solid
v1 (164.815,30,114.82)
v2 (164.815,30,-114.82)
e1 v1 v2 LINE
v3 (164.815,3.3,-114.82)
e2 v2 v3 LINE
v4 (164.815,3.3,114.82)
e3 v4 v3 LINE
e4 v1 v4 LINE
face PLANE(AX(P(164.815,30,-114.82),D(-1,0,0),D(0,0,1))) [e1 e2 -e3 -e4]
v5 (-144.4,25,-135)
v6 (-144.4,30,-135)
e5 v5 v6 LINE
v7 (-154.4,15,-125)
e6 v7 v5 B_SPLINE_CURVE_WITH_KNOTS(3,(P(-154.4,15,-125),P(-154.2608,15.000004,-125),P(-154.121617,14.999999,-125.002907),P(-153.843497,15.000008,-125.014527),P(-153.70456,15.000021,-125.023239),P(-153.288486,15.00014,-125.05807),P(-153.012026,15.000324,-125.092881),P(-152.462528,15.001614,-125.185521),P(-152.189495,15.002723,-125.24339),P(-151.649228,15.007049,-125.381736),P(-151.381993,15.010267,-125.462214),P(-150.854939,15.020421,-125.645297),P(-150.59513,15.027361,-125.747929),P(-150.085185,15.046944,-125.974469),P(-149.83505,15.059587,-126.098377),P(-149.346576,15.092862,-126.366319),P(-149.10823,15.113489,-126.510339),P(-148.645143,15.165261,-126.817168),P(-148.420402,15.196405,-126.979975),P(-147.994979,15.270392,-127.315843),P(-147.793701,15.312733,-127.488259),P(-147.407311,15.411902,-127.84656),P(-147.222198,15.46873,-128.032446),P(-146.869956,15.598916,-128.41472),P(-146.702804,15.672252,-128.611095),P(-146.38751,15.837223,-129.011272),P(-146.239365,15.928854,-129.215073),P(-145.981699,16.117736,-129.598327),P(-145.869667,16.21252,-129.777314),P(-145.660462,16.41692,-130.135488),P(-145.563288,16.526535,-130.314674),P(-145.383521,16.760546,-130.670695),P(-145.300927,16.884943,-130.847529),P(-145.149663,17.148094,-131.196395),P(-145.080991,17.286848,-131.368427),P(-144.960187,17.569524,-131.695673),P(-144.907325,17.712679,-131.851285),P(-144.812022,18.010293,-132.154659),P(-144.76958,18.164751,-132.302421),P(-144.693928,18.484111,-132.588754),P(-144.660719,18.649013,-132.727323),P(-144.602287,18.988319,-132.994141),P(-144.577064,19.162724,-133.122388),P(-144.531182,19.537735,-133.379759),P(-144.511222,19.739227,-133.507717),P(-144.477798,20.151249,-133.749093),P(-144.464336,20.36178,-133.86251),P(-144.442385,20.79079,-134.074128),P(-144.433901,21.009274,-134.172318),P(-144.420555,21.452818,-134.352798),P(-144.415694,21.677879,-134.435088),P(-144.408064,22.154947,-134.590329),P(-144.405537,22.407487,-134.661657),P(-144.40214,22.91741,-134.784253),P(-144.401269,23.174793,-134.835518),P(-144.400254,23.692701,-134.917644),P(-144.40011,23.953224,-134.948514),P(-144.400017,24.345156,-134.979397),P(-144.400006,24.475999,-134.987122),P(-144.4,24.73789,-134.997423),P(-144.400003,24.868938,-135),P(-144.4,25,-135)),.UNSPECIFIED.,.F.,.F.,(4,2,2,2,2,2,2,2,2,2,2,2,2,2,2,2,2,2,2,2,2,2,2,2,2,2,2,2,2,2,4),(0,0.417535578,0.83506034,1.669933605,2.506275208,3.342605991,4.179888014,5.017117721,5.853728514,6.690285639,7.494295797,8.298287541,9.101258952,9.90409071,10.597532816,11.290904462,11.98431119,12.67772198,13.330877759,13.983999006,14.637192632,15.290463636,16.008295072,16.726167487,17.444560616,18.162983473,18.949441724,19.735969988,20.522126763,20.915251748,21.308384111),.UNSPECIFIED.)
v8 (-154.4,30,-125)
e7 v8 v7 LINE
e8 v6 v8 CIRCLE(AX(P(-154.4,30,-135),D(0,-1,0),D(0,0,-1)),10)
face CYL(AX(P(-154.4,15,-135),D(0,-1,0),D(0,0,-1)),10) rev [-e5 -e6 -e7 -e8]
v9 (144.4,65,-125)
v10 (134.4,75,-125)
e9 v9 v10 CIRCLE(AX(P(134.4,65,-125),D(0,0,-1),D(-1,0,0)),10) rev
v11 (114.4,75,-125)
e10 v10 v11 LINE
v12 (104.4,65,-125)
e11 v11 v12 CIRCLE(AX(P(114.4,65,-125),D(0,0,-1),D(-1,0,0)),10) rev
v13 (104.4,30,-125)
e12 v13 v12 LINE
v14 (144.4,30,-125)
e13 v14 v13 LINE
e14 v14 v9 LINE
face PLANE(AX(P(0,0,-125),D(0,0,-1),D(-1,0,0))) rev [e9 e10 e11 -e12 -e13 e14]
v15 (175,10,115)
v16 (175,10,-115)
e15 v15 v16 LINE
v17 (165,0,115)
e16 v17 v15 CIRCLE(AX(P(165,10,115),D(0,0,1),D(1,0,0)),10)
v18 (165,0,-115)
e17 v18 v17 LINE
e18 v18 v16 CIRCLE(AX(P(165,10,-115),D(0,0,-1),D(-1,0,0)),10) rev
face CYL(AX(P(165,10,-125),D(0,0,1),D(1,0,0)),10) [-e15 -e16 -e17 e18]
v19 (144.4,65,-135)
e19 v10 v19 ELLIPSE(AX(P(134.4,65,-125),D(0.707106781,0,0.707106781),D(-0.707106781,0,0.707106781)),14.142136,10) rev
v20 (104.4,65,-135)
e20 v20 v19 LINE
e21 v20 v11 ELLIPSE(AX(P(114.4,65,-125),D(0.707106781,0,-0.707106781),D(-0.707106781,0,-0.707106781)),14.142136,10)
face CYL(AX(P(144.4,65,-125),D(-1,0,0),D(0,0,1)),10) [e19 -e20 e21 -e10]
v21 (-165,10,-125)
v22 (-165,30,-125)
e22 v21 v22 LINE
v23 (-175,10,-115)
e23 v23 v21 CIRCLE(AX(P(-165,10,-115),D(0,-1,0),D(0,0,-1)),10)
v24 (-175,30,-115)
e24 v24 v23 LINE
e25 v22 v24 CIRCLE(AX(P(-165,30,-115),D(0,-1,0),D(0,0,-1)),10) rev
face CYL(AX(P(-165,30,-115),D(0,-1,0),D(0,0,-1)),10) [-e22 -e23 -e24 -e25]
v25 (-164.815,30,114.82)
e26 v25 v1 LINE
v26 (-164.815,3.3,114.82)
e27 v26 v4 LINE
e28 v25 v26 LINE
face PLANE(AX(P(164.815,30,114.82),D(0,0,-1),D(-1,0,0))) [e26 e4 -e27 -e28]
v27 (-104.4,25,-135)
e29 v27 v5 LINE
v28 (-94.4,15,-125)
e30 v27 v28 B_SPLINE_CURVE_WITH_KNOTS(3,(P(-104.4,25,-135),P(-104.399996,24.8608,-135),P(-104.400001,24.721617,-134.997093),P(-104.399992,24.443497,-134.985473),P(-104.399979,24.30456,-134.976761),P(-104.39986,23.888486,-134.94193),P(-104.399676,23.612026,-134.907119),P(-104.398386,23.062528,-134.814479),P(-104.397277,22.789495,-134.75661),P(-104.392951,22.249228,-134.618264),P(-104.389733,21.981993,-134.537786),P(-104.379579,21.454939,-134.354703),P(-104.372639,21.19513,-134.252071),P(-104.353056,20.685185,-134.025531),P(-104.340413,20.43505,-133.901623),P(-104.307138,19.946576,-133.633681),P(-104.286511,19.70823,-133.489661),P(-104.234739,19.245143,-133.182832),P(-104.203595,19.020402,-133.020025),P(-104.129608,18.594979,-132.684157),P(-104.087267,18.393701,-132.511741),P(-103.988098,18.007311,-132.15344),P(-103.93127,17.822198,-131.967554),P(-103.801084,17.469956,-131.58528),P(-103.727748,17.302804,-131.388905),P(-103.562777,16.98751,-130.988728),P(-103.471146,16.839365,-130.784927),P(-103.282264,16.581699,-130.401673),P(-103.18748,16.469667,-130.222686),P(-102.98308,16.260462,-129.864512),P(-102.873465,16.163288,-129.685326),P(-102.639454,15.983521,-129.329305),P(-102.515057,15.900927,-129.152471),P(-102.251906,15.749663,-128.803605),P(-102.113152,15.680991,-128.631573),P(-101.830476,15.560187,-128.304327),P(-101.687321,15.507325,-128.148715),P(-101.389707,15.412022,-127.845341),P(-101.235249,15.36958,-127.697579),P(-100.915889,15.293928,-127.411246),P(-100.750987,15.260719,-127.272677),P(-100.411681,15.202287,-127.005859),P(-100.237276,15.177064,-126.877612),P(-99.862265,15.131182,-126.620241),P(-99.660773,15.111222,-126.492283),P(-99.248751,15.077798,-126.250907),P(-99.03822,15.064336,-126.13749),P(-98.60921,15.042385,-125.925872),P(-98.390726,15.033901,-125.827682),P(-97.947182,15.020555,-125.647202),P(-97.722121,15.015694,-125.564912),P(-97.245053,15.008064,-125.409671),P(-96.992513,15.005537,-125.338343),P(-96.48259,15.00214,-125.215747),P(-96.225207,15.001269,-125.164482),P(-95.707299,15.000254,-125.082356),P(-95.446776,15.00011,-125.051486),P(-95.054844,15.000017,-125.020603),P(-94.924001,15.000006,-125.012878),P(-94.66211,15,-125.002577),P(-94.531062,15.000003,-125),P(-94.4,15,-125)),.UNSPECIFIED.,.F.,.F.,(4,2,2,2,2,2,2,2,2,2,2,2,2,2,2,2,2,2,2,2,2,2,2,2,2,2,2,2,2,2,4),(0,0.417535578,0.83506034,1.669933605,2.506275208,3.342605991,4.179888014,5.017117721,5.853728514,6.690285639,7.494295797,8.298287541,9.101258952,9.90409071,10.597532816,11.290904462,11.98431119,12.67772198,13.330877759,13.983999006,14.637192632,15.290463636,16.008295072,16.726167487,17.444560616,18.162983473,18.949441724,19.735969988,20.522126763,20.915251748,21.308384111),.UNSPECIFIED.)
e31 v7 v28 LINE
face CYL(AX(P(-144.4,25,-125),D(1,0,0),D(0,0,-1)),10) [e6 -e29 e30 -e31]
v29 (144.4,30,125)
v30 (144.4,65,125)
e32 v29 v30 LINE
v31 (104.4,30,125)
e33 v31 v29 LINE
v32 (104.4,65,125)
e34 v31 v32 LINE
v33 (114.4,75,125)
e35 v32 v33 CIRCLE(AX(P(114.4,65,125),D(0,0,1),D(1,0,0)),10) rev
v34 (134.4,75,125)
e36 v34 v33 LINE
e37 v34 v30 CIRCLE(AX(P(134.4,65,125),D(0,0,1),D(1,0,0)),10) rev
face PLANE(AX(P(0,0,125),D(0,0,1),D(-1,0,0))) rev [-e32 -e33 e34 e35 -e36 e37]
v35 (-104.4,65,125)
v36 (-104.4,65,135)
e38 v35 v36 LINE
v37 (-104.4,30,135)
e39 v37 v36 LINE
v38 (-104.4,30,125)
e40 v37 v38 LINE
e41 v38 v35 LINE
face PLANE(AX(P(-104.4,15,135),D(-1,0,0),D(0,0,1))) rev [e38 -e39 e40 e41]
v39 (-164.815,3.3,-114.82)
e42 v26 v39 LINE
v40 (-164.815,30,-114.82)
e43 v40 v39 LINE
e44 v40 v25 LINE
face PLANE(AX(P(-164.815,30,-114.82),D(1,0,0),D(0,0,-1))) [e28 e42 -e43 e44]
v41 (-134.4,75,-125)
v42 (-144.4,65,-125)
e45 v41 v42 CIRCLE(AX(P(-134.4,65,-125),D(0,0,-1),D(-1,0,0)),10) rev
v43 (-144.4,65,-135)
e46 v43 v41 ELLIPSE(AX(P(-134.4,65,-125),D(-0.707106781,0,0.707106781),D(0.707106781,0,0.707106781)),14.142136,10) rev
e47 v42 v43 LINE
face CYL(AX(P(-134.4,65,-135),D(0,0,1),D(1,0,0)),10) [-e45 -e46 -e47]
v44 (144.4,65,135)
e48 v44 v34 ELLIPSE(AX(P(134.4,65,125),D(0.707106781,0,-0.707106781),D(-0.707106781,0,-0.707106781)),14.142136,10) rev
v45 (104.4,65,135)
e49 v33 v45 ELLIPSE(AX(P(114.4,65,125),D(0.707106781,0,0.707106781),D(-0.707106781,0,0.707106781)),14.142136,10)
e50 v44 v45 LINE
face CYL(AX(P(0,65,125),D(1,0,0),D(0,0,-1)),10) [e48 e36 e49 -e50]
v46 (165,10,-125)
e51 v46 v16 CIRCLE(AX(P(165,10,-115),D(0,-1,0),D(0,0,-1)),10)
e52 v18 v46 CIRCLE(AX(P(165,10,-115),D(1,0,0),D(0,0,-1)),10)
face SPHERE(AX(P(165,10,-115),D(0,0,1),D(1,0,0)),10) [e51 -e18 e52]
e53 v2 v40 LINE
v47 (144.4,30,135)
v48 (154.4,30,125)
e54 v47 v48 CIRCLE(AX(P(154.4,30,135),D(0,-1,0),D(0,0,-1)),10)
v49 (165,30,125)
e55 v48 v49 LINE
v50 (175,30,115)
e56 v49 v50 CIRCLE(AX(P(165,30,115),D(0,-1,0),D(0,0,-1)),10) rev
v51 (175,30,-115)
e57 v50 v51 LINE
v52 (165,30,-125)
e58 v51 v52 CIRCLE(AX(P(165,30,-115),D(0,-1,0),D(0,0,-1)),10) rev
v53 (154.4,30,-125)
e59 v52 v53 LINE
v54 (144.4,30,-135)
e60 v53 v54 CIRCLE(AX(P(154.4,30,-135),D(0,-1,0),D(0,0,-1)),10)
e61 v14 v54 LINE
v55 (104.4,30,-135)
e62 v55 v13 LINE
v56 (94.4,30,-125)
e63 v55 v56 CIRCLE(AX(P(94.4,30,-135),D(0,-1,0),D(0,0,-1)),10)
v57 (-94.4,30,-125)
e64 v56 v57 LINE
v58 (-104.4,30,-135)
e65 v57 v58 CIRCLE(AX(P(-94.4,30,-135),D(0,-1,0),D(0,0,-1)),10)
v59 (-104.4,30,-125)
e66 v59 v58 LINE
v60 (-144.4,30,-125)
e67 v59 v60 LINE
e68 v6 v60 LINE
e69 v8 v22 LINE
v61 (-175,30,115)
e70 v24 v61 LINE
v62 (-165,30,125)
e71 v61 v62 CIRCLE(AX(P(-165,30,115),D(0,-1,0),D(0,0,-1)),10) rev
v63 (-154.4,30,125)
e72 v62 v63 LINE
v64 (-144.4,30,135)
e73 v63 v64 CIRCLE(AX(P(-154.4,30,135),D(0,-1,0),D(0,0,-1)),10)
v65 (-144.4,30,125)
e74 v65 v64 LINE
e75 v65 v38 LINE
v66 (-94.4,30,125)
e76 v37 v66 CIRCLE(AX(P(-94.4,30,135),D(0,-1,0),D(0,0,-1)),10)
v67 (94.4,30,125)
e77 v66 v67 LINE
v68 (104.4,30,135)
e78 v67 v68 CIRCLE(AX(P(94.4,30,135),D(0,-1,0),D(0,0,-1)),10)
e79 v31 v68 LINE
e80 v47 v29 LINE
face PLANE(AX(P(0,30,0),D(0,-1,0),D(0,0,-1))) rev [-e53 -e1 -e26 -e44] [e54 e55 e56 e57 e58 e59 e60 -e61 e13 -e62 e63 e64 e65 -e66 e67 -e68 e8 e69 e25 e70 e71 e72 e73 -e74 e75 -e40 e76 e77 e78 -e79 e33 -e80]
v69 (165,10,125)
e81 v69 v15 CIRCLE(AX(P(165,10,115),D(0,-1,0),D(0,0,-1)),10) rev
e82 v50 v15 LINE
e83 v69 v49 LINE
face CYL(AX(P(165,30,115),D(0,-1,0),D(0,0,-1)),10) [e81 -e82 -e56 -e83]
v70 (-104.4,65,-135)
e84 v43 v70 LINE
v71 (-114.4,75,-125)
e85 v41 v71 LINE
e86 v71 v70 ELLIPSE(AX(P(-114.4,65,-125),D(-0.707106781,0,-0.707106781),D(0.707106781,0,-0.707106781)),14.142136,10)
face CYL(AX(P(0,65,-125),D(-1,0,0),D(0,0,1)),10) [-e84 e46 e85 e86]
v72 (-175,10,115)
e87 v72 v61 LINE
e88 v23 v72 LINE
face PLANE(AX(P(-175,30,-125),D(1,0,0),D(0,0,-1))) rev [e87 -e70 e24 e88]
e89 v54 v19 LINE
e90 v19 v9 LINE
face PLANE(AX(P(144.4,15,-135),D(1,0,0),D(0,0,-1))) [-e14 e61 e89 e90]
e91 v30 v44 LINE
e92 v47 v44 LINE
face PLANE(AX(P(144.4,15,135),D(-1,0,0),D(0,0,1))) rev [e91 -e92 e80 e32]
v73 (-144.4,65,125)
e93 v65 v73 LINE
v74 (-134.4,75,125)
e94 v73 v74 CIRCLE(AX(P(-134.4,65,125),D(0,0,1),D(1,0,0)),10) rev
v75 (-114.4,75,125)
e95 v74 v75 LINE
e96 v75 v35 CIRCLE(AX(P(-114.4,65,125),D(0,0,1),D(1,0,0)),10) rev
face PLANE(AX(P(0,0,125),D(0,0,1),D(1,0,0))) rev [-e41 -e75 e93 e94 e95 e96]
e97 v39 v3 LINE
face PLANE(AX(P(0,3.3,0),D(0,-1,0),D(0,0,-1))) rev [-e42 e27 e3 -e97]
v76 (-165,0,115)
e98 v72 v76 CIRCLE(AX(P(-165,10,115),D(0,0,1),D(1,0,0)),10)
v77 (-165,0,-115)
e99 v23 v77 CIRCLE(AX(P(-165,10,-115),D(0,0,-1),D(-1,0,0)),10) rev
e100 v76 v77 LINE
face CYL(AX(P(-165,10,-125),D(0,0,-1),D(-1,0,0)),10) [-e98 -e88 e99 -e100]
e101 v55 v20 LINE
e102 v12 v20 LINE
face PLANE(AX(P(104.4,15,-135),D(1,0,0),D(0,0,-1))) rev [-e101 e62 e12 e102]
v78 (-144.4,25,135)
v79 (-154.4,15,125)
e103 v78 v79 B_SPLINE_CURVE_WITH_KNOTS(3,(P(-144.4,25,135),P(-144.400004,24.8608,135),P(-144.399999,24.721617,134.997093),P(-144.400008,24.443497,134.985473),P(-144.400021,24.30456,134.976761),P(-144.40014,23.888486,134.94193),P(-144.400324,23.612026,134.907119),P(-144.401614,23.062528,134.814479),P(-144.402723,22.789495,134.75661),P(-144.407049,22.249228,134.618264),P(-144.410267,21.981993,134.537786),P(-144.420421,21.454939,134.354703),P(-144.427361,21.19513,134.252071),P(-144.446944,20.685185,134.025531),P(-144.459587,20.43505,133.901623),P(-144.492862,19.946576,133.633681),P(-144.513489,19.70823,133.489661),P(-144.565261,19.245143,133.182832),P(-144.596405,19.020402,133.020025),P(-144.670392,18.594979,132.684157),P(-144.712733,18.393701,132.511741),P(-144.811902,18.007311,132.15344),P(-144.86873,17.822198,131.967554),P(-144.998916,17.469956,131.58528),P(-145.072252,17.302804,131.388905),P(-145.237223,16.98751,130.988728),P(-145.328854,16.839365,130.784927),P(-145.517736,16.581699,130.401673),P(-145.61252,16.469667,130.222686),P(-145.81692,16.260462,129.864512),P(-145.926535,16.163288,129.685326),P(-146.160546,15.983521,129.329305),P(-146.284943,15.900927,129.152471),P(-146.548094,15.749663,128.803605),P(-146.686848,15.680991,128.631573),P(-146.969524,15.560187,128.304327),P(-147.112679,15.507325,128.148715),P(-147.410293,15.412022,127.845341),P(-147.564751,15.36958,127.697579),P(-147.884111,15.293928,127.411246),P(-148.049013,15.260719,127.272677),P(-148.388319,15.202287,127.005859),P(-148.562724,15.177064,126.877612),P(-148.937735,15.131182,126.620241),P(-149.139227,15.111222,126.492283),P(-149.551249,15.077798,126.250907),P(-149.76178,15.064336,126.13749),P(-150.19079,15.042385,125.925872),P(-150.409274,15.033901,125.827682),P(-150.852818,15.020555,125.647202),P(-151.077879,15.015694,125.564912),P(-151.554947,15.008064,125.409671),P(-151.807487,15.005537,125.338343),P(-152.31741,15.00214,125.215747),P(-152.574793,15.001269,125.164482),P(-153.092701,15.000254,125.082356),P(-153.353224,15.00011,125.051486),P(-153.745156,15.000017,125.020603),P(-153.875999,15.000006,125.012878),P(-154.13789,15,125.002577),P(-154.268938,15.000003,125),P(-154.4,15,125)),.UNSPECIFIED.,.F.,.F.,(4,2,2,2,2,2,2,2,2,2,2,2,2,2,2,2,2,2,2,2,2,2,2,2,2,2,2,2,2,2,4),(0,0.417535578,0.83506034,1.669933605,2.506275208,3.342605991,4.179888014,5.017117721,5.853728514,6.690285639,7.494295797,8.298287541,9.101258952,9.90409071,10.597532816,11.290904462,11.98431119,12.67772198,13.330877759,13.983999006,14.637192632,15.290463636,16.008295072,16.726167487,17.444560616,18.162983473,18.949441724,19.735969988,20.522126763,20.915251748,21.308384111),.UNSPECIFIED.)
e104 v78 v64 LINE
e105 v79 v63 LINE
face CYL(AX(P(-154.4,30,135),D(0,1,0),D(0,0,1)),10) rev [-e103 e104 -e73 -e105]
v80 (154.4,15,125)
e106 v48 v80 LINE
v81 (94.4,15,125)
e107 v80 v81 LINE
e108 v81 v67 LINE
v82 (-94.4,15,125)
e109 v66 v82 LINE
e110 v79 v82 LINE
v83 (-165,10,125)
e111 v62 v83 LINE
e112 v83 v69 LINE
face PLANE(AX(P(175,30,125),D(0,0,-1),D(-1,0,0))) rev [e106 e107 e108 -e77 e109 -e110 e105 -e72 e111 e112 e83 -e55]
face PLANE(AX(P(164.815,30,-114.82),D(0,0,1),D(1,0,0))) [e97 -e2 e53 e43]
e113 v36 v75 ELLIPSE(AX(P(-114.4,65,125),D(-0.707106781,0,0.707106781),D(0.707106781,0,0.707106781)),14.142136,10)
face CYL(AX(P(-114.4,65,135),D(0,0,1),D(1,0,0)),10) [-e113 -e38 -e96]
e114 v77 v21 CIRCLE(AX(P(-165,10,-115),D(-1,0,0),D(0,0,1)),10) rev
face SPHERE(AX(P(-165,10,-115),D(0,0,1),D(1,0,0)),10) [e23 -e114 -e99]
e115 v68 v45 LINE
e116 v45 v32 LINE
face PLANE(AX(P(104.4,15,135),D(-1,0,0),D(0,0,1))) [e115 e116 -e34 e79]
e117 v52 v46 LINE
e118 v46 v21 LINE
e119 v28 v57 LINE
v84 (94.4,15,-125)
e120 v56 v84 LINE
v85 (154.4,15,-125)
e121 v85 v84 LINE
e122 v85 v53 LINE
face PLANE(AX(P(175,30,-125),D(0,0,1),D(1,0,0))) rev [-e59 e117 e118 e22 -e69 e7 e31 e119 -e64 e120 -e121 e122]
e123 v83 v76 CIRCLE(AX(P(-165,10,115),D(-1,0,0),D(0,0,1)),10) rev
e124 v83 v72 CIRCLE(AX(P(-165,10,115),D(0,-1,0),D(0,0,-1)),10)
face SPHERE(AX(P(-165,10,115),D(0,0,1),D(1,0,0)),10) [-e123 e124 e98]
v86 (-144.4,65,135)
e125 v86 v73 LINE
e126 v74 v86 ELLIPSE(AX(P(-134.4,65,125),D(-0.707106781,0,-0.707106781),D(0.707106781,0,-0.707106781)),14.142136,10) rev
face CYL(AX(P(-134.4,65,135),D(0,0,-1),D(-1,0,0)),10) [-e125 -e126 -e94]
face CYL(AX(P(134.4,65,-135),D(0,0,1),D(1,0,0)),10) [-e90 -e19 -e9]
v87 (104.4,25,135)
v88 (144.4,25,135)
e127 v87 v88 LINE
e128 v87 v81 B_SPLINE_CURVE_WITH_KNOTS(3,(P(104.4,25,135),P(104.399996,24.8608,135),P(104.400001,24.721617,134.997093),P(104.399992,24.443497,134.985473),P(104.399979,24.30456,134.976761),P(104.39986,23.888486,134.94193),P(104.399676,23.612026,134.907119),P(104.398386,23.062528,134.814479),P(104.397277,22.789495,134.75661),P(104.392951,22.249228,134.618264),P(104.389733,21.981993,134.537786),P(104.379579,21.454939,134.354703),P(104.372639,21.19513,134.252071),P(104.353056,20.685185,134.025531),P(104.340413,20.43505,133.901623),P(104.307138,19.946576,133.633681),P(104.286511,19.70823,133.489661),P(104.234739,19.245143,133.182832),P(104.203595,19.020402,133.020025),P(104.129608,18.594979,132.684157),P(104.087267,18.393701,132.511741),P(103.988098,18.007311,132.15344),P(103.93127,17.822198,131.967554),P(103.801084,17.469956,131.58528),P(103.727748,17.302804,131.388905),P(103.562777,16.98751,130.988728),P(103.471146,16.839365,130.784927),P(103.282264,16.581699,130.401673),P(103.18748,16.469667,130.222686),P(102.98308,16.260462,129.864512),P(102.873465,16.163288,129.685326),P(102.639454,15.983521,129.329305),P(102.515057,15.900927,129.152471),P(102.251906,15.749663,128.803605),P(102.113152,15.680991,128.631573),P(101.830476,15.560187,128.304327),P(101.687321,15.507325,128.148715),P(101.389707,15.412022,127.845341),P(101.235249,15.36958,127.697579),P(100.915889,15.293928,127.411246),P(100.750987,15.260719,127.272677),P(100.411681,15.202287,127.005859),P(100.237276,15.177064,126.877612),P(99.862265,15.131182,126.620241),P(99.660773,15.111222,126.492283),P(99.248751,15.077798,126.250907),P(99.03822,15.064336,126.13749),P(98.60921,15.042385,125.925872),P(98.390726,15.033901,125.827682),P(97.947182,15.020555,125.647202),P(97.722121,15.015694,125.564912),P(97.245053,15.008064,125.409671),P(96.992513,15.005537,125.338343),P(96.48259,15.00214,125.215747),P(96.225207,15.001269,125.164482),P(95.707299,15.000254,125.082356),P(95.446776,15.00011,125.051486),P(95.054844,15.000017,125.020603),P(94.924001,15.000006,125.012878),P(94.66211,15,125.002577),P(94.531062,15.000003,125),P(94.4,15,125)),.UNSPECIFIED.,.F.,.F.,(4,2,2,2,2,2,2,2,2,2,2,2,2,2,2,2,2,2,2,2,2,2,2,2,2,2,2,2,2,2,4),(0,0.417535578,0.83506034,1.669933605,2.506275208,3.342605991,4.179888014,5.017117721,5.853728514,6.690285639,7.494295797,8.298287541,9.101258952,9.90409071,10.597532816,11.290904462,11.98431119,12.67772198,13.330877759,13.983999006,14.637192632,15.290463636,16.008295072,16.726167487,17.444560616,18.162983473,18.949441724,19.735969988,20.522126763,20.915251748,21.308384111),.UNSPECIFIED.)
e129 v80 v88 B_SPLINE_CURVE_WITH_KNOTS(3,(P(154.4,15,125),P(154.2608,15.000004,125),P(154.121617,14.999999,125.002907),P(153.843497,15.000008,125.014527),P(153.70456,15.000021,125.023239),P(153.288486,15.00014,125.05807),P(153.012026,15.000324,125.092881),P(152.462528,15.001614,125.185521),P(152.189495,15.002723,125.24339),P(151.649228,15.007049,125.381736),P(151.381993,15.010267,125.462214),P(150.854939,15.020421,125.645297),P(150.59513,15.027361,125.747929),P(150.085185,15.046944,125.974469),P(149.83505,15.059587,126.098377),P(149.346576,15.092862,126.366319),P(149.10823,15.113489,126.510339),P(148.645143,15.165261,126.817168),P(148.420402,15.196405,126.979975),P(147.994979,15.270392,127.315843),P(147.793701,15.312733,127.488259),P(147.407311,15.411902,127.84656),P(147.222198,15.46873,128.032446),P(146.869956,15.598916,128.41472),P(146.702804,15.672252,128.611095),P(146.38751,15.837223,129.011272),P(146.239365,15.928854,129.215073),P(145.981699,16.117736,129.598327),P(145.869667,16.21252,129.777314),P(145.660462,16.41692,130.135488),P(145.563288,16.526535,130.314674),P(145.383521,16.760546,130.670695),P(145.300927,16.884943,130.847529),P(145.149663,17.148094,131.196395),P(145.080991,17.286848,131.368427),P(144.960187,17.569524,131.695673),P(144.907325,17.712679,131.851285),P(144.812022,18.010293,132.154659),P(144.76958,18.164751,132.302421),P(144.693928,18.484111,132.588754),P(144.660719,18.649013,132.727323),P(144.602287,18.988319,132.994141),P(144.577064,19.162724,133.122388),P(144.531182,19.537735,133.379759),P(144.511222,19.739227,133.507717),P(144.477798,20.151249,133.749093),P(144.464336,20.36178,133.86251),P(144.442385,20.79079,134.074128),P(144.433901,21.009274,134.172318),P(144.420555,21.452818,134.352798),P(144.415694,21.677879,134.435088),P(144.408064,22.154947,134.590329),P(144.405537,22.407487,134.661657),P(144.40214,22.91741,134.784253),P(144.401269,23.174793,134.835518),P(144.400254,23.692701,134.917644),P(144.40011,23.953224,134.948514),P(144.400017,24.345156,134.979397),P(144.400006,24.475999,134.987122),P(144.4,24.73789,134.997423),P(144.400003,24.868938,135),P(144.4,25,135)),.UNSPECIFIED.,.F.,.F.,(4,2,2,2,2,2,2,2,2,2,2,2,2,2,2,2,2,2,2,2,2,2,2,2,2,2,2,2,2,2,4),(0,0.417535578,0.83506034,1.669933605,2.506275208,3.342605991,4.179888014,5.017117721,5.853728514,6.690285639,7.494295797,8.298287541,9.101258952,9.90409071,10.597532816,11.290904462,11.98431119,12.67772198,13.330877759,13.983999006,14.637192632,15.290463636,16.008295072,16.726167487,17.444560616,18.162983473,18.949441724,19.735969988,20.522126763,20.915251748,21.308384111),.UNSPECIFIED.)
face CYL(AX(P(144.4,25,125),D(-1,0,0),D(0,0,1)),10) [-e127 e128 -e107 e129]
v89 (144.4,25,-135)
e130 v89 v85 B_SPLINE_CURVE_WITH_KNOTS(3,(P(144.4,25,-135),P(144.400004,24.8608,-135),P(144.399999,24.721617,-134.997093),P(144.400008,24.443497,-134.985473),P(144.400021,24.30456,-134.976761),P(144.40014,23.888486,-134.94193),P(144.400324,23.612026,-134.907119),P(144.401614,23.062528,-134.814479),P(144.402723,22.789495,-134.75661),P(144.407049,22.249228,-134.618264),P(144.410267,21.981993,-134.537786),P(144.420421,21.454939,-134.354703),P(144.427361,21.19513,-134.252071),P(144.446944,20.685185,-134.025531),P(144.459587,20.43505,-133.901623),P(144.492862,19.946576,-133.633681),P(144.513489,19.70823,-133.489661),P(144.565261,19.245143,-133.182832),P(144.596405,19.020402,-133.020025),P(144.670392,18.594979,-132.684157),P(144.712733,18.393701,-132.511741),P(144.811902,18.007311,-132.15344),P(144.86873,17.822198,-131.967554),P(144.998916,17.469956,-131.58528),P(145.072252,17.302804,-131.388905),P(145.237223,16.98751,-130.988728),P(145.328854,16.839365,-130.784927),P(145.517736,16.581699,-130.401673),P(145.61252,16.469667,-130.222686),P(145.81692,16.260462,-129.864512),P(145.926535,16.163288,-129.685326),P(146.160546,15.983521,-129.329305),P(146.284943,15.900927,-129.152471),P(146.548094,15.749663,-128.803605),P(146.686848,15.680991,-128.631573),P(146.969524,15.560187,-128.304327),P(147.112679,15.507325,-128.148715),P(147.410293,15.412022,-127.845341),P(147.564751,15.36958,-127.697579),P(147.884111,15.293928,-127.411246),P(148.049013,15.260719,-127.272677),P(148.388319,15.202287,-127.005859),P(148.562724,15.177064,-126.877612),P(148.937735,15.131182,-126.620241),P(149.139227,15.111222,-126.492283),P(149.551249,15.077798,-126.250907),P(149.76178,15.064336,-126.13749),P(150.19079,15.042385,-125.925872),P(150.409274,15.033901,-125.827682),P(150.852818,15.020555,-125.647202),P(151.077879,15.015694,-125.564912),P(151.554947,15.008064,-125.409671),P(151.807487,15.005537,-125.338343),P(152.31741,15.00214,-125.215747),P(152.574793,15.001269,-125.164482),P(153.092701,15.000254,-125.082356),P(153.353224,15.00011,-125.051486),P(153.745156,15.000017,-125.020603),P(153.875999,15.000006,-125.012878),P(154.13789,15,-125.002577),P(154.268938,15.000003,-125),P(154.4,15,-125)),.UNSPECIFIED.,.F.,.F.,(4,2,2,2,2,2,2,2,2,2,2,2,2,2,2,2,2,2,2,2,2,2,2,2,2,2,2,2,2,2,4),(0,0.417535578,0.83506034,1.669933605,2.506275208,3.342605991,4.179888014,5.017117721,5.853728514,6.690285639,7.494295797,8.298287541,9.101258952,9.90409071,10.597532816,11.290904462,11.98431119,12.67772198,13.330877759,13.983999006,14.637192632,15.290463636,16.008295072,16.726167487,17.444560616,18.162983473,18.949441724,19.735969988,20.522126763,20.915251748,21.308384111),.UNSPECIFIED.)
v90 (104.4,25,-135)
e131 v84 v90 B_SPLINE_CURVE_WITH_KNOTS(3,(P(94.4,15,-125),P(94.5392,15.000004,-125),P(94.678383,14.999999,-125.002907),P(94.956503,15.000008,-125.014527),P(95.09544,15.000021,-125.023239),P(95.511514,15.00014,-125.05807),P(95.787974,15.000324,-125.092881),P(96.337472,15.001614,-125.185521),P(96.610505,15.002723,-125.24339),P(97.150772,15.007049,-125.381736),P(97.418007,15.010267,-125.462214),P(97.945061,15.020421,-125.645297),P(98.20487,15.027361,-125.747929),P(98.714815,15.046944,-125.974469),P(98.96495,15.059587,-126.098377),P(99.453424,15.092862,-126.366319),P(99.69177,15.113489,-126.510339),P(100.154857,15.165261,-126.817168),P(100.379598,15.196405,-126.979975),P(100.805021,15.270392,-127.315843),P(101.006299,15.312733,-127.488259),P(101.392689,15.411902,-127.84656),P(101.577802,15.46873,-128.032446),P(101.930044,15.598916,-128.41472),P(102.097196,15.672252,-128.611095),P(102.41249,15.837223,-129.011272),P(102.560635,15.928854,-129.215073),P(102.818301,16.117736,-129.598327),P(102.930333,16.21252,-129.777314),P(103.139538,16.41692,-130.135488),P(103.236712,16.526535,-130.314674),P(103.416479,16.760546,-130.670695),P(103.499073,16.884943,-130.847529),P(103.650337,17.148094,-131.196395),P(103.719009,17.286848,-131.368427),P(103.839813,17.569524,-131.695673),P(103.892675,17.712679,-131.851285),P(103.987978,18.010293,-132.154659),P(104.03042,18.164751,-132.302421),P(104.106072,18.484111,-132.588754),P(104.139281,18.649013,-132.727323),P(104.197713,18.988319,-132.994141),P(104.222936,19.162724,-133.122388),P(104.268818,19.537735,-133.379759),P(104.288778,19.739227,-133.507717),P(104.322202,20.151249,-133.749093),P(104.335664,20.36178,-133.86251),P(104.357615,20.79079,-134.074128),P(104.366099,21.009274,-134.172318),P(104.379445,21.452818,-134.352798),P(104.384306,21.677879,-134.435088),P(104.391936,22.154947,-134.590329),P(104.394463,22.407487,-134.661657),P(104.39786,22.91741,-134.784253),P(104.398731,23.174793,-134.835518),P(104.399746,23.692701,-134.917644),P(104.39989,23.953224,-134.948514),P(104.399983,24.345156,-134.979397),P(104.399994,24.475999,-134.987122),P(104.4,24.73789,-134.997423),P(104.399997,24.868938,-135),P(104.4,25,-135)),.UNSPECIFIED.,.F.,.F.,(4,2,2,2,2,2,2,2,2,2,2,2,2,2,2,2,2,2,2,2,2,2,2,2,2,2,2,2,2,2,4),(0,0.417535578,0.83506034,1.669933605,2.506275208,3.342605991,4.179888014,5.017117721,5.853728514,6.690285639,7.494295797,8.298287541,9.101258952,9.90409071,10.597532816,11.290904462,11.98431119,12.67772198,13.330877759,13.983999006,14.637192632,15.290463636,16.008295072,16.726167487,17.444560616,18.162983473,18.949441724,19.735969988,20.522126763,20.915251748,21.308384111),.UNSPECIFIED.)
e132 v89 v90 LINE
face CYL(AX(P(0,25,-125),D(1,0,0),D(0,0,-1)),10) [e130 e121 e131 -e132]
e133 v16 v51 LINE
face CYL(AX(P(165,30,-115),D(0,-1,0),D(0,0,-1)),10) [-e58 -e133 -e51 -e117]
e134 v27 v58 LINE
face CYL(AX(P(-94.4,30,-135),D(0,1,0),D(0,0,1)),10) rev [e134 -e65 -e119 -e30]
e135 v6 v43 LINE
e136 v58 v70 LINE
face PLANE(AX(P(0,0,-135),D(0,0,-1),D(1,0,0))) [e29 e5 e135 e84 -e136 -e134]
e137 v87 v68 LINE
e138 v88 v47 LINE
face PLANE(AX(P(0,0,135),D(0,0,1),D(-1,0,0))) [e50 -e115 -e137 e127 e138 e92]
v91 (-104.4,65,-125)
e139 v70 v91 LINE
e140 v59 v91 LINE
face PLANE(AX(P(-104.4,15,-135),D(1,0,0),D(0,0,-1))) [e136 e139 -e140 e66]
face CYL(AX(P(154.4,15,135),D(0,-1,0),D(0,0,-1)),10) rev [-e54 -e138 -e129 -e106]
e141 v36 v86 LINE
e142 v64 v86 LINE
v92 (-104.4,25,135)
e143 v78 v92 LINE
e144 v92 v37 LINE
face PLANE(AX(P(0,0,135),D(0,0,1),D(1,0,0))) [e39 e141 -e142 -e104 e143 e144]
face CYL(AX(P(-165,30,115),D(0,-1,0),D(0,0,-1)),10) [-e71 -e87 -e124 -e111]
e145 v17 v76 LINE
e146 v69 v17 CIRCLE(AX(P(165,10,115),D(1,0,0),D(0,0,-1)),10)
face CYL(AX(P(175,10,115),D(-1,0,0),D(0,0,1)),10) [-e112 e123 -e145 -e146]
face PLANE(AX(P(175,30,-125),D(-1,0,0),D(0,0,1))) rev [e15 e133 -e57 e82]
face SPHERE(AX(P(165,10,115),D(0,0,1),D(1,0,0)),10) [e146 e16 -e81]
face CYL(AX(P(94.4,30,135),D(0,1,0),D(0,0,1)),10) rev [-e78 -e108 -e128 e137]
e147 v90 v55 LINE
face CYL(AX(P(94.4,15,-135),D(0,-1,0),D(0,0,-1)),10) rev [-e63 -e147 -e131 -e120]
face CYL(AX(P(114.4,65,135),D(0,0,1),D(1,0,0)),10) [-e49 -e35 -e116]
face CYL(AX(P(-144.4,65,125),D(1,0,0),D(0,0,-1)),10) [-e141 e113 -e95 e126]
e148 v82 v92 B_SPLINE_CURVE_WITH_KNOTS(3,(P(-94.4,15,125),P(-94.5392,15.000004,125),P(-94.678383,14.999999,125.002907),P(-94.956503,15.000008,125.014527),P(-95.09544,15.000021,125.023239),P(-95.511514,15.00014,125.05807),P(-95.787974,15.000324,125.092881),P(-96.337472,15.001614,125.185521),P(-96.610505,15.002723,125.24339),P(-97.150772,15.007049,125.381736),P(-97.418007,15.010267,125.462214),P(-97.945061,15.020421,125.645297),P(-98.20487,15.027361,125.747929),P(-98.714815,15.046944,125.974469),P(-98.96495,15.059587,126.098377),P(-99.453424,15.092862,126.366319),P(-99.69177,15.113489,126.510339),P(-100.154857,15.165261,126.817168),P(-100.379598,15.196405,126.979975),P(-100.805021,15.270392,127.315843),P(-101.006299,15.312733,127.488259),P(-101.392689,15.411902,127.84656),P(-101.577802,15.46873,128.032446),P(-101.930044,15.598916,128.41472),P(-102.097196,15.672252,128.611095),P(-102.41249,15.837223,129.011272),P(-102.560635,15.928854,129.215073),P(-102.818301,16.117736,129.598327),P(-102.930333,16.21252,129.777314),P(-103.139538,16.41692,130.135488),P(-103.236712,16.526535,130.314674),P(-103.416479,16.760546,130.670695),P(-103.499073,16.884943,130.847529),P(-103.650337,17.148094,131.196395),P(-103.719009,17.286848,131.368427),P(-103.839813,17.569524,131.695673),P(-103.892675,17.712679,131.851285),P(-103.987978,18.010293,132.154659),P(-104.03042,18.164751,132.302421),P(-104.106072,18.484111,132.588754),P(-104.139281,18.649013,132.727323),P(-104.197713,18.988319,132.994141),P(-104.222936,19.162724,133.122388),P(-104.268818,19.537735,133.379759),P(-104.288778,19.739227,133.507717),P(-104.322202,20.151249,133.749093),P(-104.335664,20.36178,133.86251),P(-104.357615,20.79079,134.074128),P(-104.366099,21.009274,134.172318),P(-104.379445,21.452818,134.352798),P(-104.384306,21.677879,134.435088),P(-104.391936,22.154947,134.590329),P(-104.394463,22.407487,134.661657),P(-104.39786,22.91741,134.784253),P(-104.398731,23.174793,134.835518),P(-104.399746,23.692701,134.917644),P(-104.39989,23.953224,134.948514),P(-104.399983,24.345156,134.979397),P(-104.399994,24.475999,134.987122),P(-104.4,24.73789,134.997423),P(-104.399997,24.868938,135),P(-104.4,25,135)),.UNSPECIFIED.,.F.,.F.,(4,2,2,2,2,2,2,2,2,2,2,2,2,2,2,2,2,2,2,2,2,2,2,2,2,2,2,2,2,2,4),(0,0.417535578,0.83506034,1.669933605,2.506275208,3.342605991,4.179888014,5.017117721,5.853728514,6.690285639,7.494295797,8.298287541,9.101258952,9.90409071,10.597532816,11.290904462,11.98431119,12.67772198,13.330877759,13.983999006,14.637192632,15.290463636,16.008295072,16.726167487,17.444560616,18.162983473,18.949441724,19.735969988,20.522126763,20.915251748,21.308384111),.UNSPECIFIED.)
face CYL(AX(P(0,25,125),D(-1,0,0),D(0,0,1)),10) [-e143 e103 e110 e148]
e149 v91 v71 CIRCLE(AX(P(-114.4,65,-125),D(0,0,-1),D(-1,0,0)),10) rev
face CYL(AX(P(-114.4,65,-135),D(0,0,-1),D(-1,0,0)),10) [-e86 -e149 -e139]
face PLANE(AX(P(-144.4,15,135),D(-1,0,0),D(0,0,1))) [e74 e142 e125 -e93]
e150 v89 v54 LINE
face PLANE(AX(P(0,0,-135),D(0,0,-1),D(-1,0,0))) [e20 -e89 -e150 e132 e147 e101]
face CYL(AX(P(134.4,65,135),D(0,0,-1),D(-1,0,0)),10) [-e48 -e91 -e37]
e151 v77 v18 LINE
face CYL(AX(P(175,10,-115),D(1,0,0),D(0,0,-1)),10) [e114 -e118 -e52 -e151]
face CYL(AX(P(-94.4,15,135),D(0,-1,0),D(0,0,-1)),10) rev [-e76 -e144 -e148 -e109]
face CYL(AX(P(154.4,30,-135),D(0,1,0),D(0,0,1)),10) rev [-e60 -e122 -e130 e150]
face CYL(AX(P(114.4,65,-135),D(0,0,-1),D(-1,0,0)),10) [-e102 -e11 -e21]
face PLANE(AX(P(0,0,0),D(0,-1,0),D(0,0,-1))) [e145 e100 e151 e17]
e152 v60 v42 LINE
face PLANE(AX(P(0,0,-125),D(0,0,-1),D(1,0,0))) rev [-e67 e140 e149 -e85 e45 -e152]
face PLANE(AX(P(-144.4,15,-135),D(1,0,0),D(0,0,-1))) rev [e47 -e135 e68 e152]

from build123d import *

# Parameters (mm, degrees)
SKETCH1_W            = 350
SKETCH1_H            = 250
SKETCH1_W_2          = 329.63
SKETCH1_H_2          = 229.64
BOSS_EXTRUDE2_DEPTH  = 30
SKETCH1_3_W          = 329.63
SKETCH1_3_H          = 229.64
BOSS_EXTRUDE3_DEPTH  = 3.3
FILLET1_R            = 10
SKETCH3_W            = 40
SKETCH3_H            = 60
BOSS_EXTRUDE4_DEPTH  = 10
FILLET3_R            = 10
FILLET4_R            = 10
FILLET3_OF_MIRROR3_R = 10
FILLET4_OF_MIRROR3_R = 10
FILLET5_START        = 25.0000001
FILLET5_DEPTH        = 4.9999999
FILLET5_START_2      = 14.9999999
FILLET5_2_DEPTH      = 10.0000002
FILLET5_START_3      = -155
FILLET5_3_DEPTH      = 310


with BuildPart() as part:
    # Sketch1 → Boss-Extrude2 (new body)
    with BuildSketch(Plane(origin=(0, 0, 0), x_dir=(1, 0, 0), z_dir=(0, 1, 0))):
        Rectangle(SKETCH1_W, SKETCH1_H)
        Rectangle(SKETCH1_W_2, SKETCH1_H_2, mode=Mode.SUBTRACT)
    extrude(amount=BOSS_EXTRUDE2_DEPTH)

    # Sketch1<3> → Boss-Extrude3 (add)
    with BuildSketch(Plane(origin=(0, 0, 0), x_dir=(1, 0, 0), z_dir=(0, 1, 0))):
        Rectangle(SKETCH1_3_W, SKETCH1_3_H)
    extrude(amount=BOSS_EXTRUDE3_DEPTH)

    # Fillet1
    fillet1_edges = [part.edges().sort_by_distance(p)[0] for p in [
        (0, 0, -125),
        (175, 0, 0),
        (0, 0, 125),
        (-175, 0, 0),
        (-175, 15, -125),
        (175, 15, -125),
        (175, 15, 125),
        (-175, 15, 125),
    ]]
    fillet(fillet1_edges, radius=FILLET1_R)

    # Sketch3 → Boss-Extrude4 (add)
    with BuildSketch(Plane.XY.offset(125)):
        with Locations((-124.4, 45)):
            Rectangle(SKETCH3_W, SKETCH3_H)
    boss_extrude4 = extrude(amount=BOSS_EXTRUDE4_DEPTH)

    # Fillet3
    fillet3_edges = [part.edges().sort_by_distance(p)[0] for p in [
        (-124.4, 15, 135),
    ]]
    fillet(fillet3_edges, radius=FILLET3_R - 0.0001)  # a hair under: the kernel refuses the full size

    # Fillet4
    fillet4_edges = [part.edges().sort_by_distance(p)[0] for p in [
        (-124.4, 75, 135),
        (-104.4, 75, 130),
        (-144.4, 75, 130),
    ]]
    fillet(fillet4_edges, radius=FILLET4_R - 0.0001)  # a hair under: the kernel refuses the full size

    # Mirror3: Boss-Extrude4 across plane
    add(boss_extrude4.mirror(Plane.XY))

    # Fillet3 of Mirror3
    fillet3_of_mirror3_edges = [part.edges().sort_by_distance(p)[0] for p in [
        (-124.4, 15, -135),
    ]]
    fillet(fillet3_of_mirror3_edges, radius=FILLET3_OF_MIRROR3_R - 0.0001)  # a hair under: the kernel refuses the full size

    # Fillet4 of Mirror3
    fillet4_of_mirror3_edges = [part.edges().sort_by_distance(p)[0] for p in [
        (-124.4, 75, -135),
        (-104.4, 75, -130),
        (-144.4, 75, -130),
    ]]
    fillet(fillet4_of_mirror3_edges, radius=FILLET4_OF_MIRROR3_R - 0.0001)  # a hair under: the kernel refuses the full size

    # Mirror4: read off the stored shape, not the designer's step
    # Mirror4: part across plane


with BuildPart() as part_1:
    add(part.part)
    add(part.part.mirror(Plane(origin=(0, 0, 0), x_dir=(0, 0, 1), z_dir=(1, 0, 0))))

    # Fillet5: read off the stored shape, not the designer's step
    # Fillet5 outline → Fillet5 (add)
    with BuildSketch(Plane(origin=(0, 0, 0), x_dir=(1, 0, 0), z_dir=(0, 1, 0)).offset(FILLET5_START)):
        with BuildLine():
            Line((104.4, 125), (104.4, 135))
            ThreePointArc((104.4, 135), (101.471067812, 127.928932188), (94.4, 125))
            Line((94.4, 125), (104.4, 125))
        make_face()
        with BuildLine():
            Line((144.4, 135), (144.4, 125))
            Line((144.4, 125), (154.4, 125))
            ThreePointArc((154.4, 125), (147.328932188, 127.928932188), (144.4, 135))
        make_face()
        with BuildLine():
            Line((-154.4, 125), (-144.4, 125))
            Line((-144.4, 125), (-144.4, 135))
            ThreePointArc((-144.4, 135), (-147.328932188, 127.928932188), (-154.4, 125))
        make_face()
        with BuildLine():
            Line((-104.4, 125), (-94.4, 125))
            ThreePointArc((-94.4, 125), (-101.471067812, 127.928932188), (-104.4, 135))
            Line((-104.4, 135), (-104.4, 125))
        make_face()
        with BuildLine():
            Line((-144.4, -135), (-144.4, -125))
            Line((-144.4, -125), (-154.4, -125))
            ThreePointArc((-154.4, -125), (-147.328932188, -127.928932188), (-144.4, -135))
        make_face()
        with BuildLine():
            ThreePointArc((-104.4, -135), (-101.471067812, -127.928932188), (-94.4, -125))
            Line((-94.4, -125), (-104.4, -125))
            Line((-104.4, -125), (-104.4, -135))
        make_face()
        with BuildLine():
            Line((154.4, -125), (144.4, -125))
            Line((144.4, -125), (144.4, -135))
            ThreePointArc((144.4, -135), (147.328932188, -127.928932188), (154.4, -125))
        make_face()
        with BuildLine():
            ThreePointArc((94.4, -125), (101.471067812, -127.928932188), (104.4, -135))
            Line((104.4, -135), (104.4, -125))
            Line((104.4, -125), (94.4, -125))
        make_face()
    extrude(amount=FILLET5_DEPTH)

    # Fillet5 2 outline → Fillet5 2 (add)
    with BuildSketch(Plane(origin=(0, 0, 0), x_dir=(1, 0, 0), z_dir=(0, 1, 0)).offset(FILLET5_START_2)):
        with BuildLine():
            Line((104.4, 125), (104.4, 135))
            ThreePointArc((104.4, 135), (101.471067812, 127.928932188), (94.4, 125))
            Line((94.4, 125), (104.4, 125))
        make_face()
        with BuildLine():
            Line((144.4, 135), (144.4, 125))
            Line((144.4, 125), (154.4, 125))
            ThreePointArc((154.4, 125), (147.328932188, 127.928932188), (144.4, 135))
        make_face()
        with BuildLine():
            Line((-154.4, 125), (-144.4, 125))
            Line((-144.4, 125), (-144.4, 135))
            ThreePointArc((-144.4, 135), (-147.328932188, 127.928932188), (-154.4, 125))
        make_face()
        with BuildLine():
            Line((-104.4, 125), (-94.4, 125))
            ThreePointArc((-94.4, 125), (-101.471067812, 127.928932188), (-104.4, 135))
            Line((-104.4, 135), (-104.4, 125))
        make_face()
        with BuildLine():
            Line((-144.4, -135), (-144.4, -125))
            Line((-144.4, -125), (-154.4, -125))
            ThreePointArc((-154.4, -125), (-147.328932188, -127.928932188), (-144.4, -135))
        make_face()
        with BuildLine():
            ThreePointArc((-104.4, -135), (-101.471067812, -127.928932188), (-94.4, -125))
            Line((-94.4, -125), (-104.4, -125))
            Line((-104.4, -125), (-104.4, -135))
        make_face()
        with BuildLine():
            Line((154.4, -125), (144.4, -125))
            Line((144.4, -125), (144.4, -135))
            ThreePointArc((144.4, -135), (147.328932188, -127.928932188), (154.4, -125))
        make_face()
        with BuildLine():
            ThreePointArc((94.4, -125), (101.471067812, -127.928932188), (104.4, -135))
            Line((104.4, -135), (104.4, -125))
            Line((104.4, -125), (94.4, -125))
        make_face()
    extrude(amount=FILLET5_2_DEPTH)

    # Fillet5 3 outline → Fillet5 3 (cut)
    with BuildSketch(Plane.YZ.offset(FILLET5_START_3)):
        with BuildLine():
            Line((25, 135), (14.9999999, 135))
            Line((14.9999999, 135), (15, 125))
            ThreePointArc((15, 125), (17.928932188, 132.071067812), (25, 135))
        make_face()
        with BuildLine():
            ThreePointArc((25, -135), (17.928932188, -132.071067812), (15, -125))
            Line((15, -125), (14.9999999, -135))
            Line((14.9999999, -135), (25, -135))
        make_face()
    extrude(amount=FILLET5_3_DEPTH, mode=Mode.SUBTRACT)


solid = part_1.part
